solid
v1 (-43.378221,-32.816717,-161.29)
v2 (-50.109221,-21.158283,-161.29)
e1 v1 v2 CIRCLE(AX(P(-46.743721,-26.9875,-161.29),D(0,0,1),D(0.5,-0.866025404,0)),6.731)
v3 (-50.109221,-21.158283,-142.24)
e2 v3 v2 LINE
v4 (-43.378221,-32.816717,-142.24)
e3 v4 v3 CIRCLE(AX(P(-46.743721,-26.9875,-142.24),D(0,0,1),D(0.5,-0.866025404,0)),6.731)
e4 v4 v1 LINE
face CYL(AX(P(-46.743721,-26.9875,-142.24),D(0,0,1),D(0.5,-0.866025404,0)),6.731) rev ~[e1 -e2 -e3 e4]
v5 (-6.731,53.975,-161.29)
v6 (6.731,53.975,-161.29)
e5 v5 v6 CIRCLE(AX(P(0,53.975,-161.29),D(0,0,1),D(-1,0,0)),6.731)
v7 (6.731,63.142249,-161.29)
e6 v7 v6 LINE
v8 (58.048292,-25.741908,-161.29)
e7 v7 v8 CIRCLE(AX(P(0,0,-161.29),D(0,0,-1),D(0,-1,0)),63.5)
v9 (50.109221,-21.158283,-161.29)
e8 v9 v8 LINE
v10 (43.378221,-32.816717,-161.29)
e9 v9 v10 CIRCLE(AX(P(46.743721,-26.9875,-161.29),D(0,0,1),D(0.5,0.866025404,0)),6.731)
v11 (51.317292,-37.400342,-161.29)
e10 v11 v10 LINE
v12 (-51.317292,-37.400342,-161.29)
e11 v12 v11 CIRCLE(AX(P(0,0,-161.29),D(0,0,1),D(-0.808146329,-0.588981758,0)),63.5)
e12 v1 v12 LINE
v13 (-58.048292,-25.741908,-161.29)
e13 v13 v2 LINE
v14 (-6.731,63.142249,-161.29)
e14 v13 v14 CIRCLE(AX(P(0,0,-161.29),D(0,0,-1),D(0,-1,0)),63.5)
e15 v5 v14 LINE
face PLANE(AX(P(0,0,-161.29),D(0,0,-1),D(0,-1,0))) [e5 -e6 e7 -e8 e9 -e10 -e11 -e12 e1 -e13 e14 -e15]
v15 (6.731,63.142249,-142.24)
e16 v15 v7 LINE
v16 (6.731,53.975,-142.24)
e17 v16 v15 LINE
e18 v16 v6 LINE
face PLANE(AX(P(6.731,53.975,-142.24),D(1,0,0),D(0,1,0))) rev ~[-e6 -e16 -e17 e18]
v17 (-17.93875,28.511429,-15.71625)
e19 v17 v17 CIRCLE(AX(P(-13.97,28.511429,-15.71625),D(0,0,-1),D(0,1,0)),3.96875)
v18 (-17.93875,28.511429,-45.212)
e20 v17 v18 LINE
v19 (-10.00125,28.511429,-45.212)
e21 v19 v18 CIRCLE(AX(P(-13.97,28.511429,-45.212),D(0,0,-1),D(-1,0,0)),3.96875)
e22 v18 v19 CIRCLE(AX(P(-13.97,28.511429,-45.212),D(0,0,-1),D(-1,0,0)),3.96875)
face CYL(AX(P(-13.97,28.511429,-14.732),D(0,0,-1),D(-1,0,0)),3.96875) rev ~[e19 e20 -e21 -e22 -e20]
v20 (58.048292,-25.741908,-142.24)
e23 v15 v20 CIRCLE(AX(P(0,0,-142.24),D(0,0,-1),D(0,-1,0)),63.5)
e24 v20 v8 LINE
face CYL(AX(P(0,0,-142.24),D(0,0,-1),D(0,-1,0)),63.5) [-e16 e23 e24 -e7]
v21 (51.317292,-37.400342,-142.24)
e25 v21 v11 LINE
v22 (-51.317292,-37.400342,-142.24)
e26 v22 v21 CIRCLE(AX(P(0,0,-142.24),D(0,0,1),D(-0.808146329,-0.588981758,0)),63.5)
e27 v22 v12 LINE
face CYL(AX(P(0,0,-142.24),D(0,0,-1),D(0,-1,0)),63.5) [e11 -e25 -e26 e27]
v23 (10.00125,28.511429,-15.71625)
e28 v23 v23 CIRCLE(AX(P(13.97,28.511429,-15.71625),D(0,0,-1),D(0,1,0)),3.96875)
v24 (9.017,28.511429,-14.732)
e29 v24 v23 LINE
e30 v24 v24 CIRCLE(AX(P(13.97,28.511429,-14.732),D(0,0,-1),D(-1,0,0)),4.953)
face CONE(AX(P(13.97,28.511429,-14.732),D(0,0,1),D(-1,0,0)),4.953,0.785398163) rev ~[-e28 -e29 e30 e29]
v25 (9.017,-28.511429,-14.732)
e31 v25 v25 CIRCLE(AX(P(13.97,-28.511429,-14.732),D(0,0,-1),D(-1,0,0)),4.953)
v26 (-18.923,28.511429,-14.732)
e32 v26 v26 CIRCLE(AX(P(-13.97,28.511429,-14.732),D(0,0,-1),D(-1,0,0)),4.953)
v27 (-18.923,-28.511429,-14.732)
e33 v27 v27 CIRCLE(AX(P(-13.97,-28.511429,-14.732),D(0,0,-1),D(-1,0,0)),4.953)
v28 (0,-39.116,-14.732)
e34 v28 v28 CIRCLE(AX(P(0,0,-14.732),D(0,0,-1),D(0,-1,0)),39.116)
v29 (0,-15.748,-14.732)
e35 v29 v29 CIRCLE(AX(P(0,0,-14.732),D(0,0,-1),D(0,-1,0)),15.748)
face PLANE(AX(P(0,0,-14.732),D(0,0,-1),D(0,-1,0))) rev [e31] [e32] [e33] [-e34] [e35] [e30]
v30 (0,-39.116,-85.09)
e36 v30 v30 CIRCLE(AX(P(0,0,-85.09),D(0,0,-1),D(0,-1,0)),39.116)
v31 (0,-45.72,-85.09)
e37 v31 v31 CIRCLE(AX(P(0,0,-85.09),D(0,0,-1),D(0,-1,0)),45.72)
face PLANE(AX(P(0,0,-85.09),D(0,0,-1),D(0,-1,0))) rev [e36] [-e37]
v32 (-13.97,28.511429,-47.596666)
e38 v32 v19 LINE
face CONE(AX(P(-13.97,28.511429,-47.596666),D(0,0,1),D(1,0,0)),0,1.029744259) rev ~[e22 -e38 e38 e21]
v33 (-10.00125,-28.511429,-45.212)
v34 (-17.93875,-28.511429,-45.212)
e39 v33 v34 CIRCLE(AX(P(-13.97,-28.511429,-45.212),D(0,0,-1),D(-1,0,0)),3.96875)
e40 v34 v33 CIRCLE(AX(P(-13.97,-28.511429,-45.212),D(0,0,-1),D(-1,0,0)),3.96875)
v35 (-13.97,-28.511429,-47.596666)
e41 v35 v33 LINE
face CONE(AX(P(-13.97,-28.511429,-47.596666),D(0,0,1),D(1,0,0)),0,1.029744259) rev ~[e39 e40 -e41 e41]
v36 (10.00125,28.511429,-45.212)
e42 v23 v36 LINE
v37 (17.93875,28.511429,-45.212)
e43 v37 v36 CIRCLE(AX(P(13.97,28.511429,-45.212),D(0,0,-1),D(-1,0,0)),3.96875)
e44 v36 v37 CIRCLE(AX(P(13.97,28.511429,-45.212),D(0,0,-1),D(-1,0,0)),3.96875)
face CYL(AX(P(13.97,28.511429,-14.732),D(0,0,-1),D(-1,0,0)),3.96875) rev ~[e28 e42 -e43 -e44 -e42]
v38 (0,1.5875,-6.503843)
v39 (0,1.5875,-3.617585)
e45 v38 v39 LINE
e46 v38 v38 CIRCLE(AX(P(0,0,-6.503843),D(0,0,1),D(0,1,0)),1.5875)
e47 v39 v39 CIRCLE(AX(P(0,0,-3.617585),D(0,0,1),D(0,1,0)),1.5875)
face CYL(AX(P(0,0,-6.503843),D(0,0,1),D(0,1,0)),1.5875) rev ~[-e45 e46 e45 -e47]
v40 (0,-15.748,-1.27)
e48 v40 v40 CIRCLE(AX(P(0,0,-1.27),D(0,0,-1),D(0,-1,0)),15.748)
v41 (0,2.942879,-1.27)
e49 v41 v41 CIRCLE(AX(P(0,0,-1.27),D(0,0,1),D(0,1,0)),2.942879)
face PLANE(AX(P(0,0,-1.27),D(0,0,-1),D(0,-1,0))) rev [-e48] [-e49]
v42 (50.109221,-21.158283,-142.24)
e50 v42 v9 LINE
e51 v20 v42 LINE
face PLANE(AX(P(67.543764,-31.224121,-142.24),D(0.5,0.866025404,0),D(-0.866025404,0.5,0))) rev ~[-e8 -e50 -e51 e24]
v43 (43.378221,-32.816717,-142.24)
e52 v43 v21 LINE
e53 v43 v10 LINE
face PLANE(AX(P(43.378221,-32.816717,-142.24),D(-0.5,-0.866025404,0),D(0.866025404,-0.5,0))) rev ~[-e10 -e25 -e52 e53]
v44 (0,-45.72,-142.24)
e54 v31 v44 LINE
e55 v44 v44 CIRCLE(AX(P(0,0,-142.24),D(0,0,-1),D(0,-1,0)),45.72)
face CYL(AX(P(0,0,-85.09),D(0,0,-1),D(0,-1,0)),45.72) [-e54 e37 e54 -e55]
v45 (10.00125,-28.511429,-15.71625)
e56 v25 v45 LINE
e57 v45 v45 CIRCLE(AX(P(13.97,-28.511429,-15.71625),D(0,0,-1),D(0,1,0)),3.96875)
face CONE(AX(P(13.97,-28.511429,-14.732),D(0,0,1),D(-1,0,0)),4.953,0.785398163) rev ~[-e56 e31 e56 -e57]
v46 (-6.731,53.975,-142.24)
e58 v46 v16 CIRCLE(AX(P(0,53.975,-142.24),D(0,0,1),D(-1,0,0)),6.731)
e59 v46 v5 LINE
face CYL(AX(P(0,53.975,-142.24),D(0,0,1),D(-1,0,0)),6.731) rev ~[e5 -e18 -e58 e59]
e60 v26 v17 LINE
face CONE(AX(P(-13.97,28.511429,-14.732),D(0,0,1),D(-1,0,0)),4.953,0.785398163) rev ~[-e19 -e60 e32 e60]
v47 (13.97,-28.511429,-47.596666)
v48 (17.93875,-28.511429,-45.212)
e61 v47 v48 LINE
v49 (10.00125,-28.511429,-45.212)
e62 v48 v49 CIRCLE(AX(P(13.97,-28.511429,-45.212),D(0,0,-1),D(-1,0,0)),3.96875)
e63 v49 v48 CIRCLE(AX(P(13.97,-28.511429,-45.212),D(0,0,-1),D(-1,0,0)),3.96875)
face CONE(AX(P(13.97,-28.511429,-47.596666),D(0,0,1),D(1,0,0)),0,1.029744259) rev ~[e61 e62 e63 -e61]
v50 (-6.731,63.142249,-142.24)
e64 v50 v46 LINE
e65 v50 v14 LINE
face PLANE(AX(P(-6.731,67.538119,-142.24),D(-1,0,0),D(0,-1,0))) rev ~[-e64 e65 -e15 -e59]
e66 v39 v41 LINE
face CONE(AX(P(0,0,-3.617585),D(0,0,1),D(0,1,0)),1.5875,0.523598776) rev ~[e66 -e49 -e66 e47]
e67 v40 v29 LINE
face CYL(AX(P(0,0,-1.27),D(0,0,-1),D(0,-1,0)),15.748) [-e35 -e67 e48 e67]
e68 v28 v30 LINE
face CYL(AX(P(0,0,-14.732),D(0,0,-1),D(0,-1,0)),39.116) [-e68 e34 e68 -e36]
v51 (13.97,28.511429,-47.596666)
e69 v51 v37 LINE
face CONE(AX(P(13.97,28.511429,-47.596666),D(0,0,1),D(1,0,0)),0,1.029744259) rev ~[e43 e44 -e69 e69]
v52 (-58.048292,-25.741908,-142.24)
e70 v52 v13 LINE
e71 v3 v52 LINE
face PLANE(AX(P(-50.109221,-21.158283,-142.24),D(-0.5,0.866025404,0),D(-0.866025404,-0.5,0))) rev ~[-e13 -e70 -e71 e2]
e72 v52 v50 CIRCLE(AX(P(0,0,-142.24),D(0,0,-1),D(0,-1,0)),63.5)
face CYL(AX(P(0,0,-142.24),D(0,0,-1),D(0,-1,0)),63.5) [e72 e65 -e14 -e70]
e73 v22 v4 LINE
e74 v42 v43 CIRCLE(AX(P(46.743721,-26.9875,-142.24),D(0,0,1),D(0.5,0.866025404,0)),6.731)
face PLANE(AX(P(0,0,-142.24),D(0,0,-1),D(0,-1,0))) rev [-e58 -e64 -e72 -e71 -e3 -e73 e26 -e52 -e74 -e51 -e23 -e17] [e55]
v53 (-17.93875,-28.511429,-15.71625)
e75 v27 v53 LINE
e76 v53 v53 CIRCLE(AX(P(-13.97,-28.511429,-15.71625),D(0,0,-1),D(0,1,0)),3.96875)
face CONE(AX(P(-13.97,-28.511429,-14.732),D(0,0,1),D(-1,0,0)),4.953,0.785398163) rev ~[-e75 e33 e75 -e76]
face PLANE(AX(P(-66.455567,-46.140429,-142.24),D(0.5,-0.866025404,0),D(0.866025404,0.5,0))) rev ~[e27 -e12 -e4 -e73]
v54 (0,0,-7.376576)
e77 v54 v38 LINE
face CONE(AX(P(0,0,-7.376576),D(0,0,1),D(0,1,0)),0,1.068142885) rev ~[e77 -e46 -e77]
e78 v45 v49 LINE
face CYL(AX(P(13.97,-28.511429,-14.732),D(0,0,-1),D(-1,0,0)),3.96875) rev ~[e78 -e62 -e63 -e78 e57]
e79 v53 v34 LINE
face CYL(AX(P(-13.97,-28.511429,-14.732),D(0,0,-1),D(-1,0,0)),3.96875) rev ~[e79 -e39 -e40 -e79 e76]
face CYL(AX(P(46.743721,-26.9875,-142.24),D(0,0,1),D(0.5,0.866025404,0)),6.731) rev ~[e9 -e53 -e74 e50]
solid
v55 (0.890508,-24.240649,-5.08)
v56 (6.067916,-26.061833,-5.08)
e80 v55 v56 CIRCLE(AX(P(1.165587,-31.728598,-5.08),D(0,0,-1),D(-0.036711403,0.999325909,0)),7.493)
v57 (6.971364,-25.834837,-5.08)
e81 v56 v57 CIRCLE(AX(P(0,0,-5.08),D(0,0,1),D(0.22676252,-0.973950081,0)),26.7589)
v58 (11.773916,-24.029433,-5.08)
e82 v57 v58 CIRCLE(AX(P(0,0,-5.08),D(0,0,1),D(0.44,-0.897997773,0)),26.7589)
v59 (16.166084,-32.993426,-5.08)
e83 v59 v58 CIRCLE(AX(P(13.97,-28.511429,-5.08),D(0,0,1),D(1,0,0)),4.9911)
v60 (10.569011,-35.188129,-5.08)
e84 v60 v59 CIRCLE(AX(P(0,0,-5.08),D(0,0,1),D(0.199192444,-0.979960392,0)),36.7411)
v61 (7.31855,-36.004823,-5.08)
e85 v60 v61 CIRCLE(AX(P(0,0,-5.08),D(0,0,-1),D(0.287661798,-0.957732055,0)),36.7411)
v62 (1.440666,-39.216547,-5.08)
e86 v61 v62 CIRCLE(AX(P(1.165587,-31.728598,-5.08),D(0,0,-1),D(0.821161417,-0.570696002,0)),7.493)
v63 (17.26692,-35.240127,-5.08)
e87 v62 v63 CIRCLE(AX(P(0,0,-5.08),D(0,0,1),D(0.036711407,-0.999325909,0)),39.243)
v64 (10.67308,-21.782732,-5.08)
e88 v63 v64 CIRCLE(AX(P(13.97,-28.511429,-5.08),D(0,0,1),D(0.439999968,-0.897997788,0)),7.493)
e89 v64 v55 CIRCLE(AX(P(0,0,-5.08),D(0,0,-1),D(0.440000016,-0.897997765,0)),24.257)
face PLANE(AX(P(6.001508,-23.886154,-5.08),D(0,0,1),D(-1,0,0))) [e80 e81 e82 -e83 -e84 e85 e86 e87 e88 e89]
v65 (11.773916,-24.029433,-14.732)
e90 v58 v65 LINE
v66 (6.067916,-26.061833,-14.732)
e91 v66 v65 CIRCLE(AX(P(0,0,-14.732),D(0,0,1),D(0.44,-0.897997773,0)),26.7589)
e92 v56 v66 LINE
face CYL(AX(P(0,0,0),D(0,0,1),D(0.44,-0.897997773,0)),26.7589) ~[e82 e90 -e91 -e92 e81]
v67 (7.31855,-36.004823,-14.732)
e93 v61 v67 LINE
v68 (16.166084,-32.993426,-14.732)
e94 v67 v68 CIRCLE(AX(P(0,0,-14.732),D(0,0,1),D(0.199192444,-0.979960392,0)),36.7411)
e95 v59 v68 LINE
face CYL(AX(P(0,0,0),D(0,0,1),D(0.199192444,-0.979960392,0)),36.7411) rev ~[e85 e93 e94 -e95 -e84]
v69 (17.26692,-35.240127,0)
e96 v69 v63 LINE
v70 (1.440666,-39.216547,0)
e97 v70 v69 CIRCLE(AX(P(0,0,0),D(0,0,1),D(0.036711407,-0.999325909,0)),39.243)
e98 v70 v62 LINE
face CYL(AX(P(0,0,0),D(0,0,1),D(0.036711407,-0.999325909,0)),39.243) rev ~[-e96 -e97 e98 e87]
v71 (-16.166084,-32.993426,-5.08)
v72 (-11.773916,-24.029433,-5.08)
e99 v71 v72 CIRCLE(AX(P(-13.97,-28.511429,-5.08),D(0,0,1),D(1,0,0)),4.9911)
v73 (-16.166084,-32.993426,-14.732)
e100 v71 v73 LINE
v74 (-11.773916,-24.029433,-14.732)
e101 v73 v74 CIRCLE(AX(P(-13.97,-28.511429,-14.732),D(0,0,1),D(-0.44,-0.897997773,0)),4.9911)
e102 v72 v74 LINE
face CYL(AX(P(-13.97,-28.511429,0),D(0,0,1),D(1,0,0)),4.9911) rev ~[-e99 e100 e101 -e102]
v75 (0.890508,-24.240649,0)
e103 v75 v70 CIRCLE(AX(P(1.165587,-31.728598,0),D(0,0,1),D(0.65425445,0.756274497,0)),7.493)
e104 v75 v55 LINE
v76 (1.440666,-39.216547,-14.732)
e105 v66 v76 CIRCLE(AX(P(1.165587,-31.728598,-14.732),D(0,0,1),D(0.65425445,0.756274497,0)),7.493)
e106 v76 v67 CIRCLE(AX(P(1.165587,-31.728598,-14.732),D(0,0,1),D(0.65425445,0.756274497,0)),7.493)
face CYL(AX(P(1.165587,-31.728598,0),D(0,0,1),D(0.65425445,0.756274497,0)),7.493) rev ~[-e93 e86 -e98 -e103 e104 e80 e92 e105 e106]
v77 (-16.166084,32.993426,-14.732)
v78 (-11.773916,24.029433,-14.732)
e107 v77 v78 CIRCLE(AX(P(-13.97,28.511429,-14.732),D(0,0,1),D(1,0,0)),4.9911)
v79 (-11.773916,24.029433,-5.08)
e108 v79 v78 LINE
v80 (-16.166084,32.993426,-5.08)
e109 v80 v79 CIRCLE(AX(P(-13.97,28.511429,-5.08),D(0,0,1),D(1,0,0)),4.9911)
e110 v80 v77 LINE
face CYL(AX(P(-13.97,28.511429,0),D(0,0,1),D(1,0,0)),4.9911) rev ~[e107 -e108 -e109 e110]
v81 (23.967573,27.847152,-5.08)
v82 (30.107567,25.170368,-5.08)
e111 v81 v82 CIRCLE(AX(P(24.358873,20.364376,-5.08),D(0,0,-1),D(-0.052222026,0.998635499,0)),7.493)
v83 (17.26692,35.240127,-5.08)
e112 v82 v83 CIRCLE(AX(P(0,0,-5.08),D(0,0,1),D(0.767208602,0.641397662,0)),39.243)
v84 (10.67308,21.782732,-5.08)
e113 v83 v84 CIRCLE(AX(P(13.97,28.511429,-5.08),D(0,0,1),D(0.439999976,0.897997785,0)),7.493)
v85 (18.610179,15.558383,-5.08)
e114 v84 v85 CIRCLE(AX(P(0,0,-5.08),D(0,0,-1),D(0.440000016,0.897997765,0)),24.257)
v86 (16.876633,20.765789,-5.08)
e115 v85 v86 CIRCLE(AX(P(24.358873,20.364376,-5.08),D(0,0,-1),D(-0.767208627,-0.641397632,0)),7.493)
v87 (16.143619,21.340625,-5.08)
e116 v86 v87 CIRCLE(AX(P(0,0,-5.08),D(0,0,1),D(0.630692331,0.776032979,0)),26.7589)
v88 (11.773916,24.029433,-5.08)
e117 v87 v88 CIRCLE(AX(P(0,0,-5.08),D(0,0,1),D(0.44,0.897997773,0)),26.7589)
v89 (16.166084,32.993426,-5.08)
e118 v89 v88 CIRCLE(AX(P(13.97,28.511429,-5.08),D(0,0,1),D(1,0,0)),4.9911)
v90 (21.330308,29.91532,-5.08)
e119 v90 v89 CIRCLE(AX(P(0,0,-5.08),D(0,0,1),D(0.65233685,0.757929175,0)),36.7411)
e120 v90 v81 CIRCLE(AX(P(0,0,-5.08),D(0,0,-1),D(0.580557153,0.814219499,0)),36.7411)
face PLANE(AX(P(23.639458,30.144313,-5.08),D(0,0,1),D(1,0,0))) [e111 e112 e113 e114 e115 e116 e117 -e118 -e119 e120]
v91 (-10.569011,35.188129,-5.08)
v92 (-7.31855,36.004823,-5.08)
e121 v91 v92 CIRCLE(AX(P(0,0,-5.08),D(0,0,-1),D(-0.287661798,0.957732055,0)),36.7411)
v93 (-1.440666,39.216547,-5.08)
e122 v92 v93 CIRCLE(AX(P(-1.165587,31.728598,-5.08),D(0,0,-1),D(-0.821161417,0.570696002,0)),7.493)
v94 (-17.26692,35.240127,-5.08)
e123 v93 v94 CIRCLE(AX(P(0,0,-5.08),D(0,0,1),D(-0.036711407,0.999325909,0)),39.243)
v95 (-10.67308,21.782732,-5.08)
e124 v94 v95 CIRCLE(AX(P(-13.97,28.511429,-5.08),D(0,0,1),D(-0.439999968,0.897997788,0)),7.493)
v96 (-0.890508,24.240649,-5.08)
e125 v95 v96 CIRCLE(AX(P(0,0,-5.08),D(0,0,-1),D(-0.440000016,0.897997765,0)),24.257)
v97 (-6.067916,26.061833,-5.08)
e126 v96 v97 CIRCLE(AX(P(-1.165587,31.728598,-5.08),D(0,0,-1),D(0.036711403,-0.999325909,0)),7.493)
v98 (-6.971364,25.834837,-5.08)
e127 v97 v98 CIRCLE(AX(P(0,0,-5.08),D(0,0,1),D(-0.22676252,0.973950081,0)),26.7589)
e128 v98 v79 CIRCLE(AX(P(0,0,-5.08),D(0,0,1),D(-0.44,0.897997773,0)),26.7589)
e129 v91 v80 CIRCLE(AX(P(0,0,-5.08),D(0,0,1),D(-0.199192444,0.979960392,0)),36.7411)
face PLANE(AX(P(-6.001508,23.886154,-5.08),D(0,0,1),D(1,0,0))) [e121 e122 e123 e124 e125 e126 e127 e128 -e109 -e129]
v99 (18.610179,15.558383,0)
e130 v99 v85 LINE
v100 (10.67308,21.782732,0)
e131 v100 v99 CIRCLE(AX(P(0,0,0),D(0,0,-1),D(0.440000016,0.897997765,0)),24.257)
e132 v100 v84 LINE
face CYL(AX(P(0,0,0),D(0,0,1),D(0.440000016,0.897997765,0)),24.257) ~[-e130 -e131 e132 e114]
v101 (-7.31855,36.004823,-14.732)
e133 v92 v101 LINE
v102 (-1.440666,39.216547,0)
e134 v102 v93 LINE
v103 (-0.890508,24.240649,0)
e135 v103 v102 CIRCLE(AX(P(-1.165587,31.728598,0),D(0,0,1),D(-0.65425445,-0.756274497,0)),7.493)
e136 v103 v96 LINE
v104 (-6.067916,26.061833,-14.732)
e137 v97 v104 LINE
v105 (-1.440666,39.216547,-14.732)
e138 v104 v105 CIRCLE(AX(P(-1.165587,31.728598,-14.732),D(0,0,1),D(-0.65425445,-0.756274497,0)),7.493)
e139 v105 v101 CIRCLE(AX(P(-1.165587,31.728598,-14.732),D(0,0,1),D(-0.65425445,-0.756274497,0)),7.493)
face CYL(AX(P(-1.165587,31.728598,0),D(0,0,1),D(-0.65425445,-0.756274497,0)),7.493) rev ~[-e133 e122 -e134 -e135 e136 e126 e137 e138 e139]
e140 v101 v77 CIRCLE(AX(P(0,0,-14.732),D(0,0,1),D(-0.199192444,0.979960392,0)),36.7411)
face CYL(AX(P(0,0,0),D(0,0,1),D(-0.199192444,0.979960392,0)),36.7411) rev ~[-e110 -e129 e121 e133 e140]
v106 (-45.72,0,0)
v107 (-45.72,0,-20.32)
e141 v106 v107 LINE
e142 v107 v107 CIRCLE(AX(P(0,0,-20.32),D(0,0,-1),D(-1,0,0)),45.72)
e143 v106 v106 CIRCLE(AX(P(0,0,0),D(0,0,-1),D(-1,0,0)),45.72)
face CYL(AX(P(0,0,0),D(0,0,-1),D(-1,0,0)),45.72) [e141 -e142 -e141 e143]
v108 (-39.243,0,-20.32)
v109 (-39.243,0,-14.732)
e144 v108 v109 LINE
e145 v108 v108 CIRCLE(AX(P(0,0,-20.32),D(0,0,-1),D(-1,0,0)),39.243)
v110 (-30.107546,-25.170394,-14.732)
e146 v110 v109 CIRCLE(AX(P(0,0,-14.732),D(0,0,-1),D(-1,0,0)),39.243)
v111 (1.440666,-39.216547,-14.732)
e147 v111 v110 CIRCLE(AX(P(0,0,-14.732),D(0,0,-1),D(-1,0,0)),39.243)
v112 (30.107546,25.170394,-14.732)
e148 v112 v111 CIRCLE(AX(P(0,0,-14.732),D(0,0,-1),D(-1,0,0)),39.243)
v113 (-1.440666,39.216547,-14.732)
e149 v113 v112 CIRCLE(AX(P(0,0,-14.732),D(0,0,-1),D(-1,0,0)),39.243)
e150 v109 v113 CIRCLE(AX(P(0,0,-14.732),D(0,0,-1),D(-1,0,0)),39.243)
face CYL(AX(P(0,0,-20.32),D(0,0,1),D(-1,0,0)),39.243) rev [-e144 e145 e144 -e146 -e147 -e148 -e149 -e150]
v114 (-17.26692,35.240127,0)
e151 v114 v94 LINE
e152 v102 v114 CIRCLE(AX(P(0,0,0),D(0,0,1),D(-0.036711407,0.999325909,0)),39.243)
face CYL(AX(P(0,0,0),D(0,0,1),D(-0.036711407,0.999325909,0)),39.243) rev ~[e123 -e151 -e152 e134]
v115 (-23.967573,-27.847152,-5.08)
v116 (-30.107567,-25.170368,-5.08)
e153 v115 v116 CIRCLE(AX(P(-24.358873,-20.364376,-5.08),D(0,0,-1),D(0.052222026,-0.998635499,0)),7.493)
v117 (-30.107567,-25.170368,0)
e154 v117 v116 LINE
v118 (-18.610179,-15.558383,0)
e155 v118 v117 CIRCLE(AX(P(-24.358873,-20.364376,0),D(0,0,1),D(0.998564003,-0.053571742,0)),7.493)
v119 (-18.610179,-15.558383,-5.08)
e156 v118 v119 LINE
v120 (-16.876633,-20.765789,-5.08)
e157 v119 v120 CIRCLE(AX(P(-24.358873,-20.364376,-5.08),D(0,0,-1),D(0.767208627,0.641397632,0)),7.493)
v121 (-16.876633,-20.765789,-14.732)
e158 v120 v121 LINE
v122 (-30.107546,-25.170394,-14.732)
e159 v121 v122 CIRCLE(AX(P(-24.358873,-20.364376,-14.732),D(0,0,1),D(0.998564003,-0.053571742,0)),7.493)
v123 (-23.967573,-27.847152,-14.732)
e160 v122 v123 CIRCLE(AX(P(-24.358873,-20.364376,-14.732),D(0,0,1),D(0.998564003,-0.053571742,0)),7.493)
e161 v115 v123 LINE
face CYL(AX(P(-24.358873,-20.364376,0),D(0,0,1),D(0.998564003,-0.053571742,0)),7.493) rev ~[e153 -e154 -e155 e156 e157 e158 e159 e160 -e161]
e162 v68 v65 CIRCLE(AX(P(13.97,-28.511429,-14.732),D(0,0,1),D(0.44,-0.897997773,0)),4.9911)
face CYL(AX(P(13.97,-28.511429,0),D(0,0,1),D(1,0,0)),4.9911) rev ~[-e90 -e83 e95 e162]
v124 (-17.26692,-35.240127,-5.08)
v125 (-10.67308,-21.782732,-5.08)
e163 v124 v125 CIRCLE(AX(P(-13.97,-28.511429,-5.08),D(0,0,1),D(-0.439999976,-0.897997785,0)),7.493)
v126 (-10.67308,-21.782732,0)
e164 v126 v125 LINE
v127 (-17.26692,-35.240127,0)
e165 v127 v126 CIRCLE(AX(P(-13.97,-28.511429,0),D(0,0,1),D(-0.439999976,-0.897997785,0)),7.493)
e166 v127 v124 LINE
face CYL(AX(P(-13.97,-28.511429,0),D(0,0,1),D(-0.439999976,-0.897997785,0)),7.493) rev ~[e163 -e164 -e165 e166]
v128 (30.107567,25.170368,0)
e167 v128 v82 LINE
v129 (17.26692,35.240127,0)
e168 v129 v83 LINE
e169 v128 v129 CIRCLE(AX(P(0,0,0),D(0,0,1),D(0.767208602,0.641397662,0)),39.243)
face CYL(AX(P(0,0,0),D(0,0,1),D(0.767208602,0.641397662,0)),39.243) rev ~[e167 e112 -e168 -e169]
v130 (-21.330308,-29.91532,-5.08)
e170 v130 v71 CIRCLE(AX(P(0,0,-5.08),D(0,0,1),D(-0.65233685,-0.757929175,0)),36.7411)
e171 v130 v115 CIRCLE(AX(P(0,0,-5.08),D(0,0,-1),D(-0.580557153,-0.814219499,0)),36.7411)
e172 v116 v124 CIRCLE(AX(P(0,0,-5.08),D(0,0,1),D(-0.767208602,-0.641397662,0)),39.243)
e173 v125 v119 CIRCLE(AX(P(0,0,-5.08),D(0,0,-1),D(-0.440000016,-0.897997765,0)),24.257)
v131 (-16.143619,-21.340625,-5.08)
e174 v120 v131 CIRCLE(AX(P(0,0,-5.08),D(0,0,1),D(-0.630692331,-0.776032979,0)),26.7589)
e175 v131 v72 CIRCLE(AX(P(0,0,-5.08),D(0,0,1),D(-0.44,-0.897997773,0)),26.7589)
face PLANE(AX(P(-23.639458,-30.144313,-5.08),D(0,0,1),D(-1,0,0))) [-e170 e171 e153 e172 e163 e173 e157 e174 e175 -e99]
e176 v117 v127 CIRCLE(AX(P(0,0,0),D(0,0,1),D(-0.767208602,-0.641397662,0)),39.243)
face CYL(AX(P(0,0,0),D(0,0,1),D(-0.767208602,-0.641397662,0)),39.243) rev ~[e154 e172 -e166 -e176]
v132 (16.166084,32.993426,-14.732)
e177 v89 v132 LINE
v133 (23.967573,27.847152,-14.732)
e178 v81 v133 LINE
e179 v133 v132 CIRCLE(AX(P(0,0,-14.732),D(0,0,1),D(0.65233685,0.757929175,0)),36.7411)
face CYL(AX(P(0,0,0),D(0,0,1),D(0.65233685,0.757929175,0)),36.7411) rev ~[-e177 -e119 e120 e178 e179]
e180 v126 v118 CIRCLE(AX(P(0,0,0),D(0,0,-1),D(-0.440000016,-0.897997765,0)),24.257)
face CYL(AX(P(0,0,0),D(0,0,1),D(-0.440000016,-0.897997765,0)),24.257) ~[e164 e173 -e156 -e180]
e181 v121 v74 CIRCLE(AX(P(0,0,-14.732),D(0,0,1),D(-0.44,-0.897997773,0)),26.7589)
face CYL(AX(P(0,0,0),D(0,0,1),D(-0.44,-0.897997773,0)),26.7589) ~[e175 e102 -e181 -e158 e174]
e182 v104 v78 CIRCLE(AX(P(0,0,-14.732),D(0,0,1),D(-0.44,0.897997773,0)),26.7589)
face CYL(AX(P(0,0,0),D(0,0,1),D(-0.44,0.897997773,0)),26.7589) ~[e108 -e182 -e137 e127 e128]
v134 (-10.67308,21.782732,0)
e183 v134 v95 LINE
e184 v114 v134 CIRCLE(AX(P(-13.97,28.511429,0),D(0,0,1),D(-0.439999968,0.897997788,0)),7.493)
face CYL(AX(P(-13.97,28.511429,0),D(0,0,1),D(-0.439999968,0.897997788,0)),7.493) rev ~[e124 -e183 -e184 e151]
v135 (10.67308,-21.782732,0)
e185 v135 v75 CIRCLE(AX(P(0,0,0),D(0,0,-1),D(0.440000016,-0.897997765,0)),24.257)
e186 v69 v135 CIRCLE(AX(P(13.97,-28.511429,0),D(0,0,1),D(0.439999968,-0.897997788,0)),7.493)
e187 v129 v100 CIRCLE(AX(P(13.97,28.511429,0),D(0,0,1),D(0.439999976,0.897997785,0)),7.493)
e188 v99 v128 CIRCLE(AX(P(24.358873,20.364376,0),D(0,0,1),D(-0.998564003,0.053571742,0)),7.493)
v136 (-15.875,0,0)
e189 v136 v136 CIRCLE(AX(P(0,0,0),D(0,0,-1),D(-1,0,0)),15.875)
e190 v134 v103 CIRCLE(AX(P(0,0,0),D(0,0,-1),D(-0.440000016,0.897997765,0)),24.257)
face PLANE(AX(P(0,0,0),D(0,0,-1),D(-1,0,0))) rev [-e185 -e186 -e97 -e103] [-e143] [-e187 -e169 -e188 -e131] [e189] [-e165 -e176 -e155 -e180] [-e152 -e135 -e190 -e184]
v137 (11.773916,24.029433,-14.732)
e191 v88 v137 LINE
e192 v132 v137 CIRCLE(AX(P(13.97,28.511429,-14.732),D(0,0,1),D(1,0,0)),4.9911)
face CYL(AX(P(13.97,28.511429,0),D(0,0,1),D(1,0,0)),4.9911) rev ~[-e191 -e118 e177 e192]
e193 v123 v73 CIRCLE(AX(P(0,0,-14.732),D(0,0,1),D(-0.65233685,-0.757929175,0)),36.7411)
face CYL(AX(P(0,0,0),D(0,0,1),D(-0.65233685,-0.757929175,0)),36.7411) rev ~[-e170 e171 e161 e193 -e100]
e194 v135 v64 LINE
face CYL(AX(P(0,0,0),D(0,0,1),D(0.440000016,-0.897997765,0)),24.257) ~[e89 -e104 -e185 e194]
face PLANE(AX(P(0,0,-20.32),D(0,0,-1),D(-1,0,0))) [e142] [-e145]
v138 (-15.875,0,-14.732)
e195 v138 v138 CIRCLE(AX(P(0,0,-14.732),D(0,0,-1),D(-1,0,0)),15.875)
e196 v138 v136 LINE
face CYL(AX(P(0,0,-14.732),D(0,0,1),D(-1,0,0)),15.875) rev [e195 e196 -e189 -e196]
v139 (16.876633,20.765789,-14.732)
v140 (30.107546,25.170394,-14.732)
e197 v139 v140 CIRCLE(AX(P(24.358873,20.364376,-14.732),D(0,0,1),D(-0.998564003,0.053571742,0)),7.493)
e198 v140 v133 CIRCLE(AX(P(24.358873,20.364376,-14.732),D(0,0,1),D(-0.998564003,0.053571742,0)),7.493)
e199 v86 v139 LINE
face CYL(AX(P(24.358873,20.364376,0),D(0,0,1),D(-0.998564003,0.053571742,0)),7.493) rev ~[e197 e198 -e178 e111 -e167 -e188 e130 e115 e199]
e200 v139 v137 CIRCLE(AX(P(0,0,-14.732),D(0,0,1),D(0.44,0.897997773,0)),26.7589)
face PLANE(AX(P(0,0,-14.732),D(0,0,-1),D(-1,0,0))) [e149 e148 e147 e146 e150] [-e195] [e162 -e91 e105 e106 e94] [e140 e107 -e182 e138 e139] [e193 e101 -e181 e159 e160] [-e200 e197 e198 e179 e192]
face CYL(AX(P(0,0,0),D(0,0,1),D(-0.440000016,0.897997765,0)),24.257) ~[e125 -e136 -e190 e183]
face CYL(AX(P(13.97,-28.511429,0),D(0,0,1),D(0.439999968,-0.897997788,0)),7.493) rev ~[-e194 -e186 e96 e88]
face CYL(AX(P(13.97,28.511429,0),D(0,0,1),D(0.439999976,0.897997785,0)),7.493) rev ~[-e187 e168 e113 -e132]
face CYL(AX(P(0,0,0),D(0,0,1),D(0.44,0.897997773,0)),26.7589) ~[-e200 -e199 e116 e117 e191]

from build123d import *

# Parameters (mm, degrees)
F2_R            = 4.9911
F3_DEPTH        = 20.321
F5_DEPTH        = 20.321
F5_COPIES_COUNT = 2
F7_DEPTH        = 5.08
F7_COPIES_COUNT = 2
F12_D           = 7.9375
F12_DEPTH       = 30.48
F12_CSINK_D     = 9.906
F12_CSINK_ANGLE = 90
F12_TIP         = 2.3846655818
F14_DEPTH       = 25.4


# Not quite as in the source:
# - a pattern or mirror of a feature is missing from the dataset's text; its kind, count and spacing are read off the source's solid


with BuildPart() as f1:
    # F0 (on Front) → F1 (revolve)
    with BuildSketch(Plane.XZ):
        Polygon((-15.875, -14.732), (-15.875, 0), (-45.72, 0), (-45.72, -20.32), (-39.243, -20.32), (-39.243, -14.732), align=None)
    revolve(axis=Axis((0, 0, -19.2851209147), (0, 0, -1)))

    # F2 (on face) → F3 (cut, through all)
    with BuildSketch(Plane.XY):
        with Locations((-13.97, 28.5114292872)):
            Circle(F2_R)
        with Locations((13.97, 28.5114292872)):
            Circle(F2_R)
        with Locations((13.97, -28.5114292872)):
            Circle(F2_R)
        with Locations((-13.97, -28.5114292872)):
            Circle(F2_R)
    extrude(amount=-F3_DEPTH, mode=Mode.SUBTRACT)

    # F4 (on face) → F5 (cut, through all)
    with BuildSketch(Plane.XY):
        with BuildLine():
            ThreePointArc((-11.773916, 24.0294326033), (-8.978607984, 25.2076045645), (-6.0679155964, 26.0618328121))
            ThreePointArc((-6.0679155964, 26.0618328121), (6.2688347989, 32.6637026574), (-7.318549504, 36.0048227654))
            ThreePointArc((-7.318549504, 36.0048227654), (-11.8384597971, 34.7815942539), (-16.166084, 32.9934259712))
            ThreePointArc((-16.166084, 32.9934259712), (-18.451996684, 26.3153452872), (-11.773916, 24.0294326033))
        make_face()
        with BuildLine():
            ThreePointArc((11.773916, 24.0294326033), (14.4179170537, 22.5424576531), (16.876633005, 20.7657888756))
            ThreePointArc((16.876633005, 20.7657888756), (29.6536423348, 15.0624452633), (23.9675734397, 27.847151607))
            ThreePointArc((23.9675734397, 27.847151607), (20.2311307106, 30.6693622265), (16.166084, 32.9934259712))
            ThreePointArc((16.166084, 32.9934259712), (9.488003316, 30.7075132872), (11.773916, 24.0294326033))
        make_face()
    f5 = extrude(amount=-F5_DEPTH, mode=Mode.SUBTRACT)

    # F5_copies: F5 ×2 about axis
    f5_copies_axis = Axis((0, 0, 0), (0, 0, 1))
    for i in range(1, F5_COPIES_COUNT):
        add(f5.rotate(f5_copies_axis, i * 360 / F5_COPIES_COUNT), mode=Mode.SUBTRACT)

    # F6 (on face) → F7 (cut)
    with BuildSketch(Plane.XY):
        with BuildLine():
            ThreePointArc((-6.0679155964, 26.0618328121), (-6.5206277247, 25.952266631), (-6.9713641639, 25.8348371565))
            ThreePointArc((-6.9713641639, 25.8348371565), (-8.4378661433, 23.4576639591), (-10.6730803815, 21.7827317885))
            ThreePointArc((-10.6730803815, 21.7827317885), (-5.9109631603, 23.5257850776), (-0.890508463, 24.240648582))
            ThreePointArc((-0.890508463, 24.240648582), (-3.6519576039, 24.6601458625), (-6.0679155964, 26.0618328121))
        make_face()
        with BuildLine():
            ThreePointArc((-16.166084, 32.9934259712), (-13.4125130079, 34.2054516711), (-10.5690108827, 35.1881292224))
            ThreePointArc((-10.5690108827, 35.1881292224), (-13.9118317745, 36.0042035036), (-17.2669197627, 35.2401267153))
            ThreePointArc((-17.2669197627, 35.2401267153), (-20.6986974634, 25.2145095966), (-10.6730803815, 21.7827317885))
            ThreePointArc((-10.6730803815, 21.7827317885), (-8.4378661433, 23.4576639591), (-6.9713641639, 25.8348371565))
            ThreePointArc((-6.9713641639, 25.8348371565), (-9.4160104878, 25.0475043807), (-11.773916, 24.0294326033))
            ThreePointArc((-11.773916, 24.0294326033), (-18.451996684, 26.3153452872), (-16.166084, 32.9934259712))
        make_face()
        with BuildLine():
            ThreePointArc((-17.2669197627, 35.2401267153), (-13.9118317745, 36.0042035036), (-10.5690108827, 35.1881292224))
            ThreePointArc((-10.5690108827, 35.1881292224), (-8.9530972983, 35.633558312), (-7.318549504, 36.0048227654))
            ThreePointArc((-7.318549504, 36.0048227654), (-4.7584578806, 38.3040312845), (-1.440665747, 39.2165466507))
            ThreePointArc((-1.440665747, 39.2165466507), (-9.562762037, 38.0600398216), (-17.2669197627, 35.2401267153))
        make_face()
        with BuildLine():
            ThreePointArc((30.1075671654, 25.1703684593), (24.2164306207, 30.8800507932), (17.2669198215, 35.2401266865))
            ThreePointArc((17.2669198215, 35.2401266865), (19.9267205597, 33.0570347666), (21.3303084021, 29.9153200331))
            ThreePointArc((21.3303084021, 29.9153200331), (22.6725352574, 28.9113225953), (23.9675734397, 27.847151607))
            ThreePointArc((23.9675734397, 27.847151607), (27.3533197427, 27.2330247473), (30.1075671654, 25.1703684593))
        make_face()
        with BuildLine():
            ThreePointArc((21.3303084021, 29.9153200331), (19.9267205597, 33.0570347666), (17.2669198215, 35.2401266865))
            ThreePointArc((17.2669198215, 35.2401266865), (7.2413025475, 31.808349), (10.673080396, 21.7827317814))
            ThreePointArc((10.673080396, 21.7827317814), (13.3664144509, 21.0427792429), (16.1436191209, 21.3406253632))
            ThreePointArc((16.1436191209, 21.3406253632), (14.023359544, 22.7900003578), (11.773916, 24.0294326033))
            ThreePointArc((11.773916, 24.0294326033), (9.488003316, 30.7075132872), (16.166084, 32.9934259712))
            ThreePointArc((16.166084, 32.9934259712), (18.8112611176, 31.560178776), (21.3303084021, 29.9153200331))
        make_face()
        with BuildLine():
            ThreePointArc((16.1436191209, 21.3406253632), (13.3664144509, 21.0427792429), (10.673080396, 21.7827317814))
            ThreePointArc((10.673080396, 21.7827317814), (14.9687322834, 19.0876688683), (18.6101788379, 15.558383355))
            ThreePointArc((18.6101788379, 15.558383355), (17.2494656652, 17.9976533533), (16.876633005, 20.7657888756))
            ThreePointArc((16.876633005, 20.7657888756), (16.5126276486, 21.0563970648), (16.1436191209, 21.3406253632))
        make_face()
        with BuildLine():
            ThreePointArc((-6.9713641639, 25.8348371565), (-6.6016274755, 27.1504974961), (-6.477, 28.5114292872))
            ThreePointArc((-6.477, 28.5114292872), (-7.5813905873, 32.4268754651), (-10.5690108827, 35.1881292224))
            ThreePointArc((-10.5690108827, 35.1881292224), (-13.4125130079, 34.2054516711), (-16.166084, 32.9934259712))
            ThreePointArc((-16.166084, 32.9934259712), (-18.451996684, 26.3153452872), (-11.773916, 24.0294326033))
            ThreePointArc((-11.773916, 24.0294326033), (-9.4160104878, 25.0475043807), (-6.9713641639, 25.8348371565))
        make_face()
        with BuildLine():
            ThreePointArc((21.463, 28.5114292872), (21.4297533423, 29.216503093), (21.3303084021, 29.9153200331))
            ThreePointArc((21.3303084021, 29.9153200331), (18.8112611176, 31.560178776), (16.166084, 32.9934259712))
            ThreePointArc((16.166084, 32.9934259712), (9.488003316, 30.7075132872), (11.773916, 24.0294326033))
            ThreePointArc((11.773916, 24.0294326033), (14.023359544, 22.7900003578), (16.1436191209, 21.3406253632))
            ThreePointArc((16.1436191209, 21.3406253632), (19.9879721282, 24.047231659), (21.463, 28.5114292872))
        make_face()
    f7 = extrude(amount=-F7_DEPTH, mode=Mode.SUBTRACT)

    # F7_copies: F7 ×2 about axis
    f7_copies_axis = Axis((0, 0, 0), (0, 0, 1))
    for i in range(1, F7_COPIES_COUNT):
        add(f7.rotate(f7_copies_axis, i * 360 / F7_COPIES_COUNT), mode=Mode.SUBTRACT)


with BuildPart() as f9:
    # F8 (on Right) → F9 (revolve)
    with BuildSketch(Plane.YZ):
        Polygon((-39.116, -14.732), (-39.116, -85.09), (-45.72, -85.09), (-45.72, -142.24), (-63.5, -142.24), (-63.5, -161.29), (0, -161.29), (0, -1.27), (-15.748, -1.27), (-15.748, -14.732), align=None)
    revolve(axis=Axis((0, 0, -69.3293474615), (0, 0, -1)))

    # F12
    with Locations(Plane.XY.offset(-14.732)):
        with Locations((-13.97, 28.5114292872), (-13.97, -28.5114292872), (13.97, -28.5114292872), (13.97, 28.5114292872)):
            CounterSinkHole(F12_D / 2, F12_CSINK_D / 2, depth=F12_DEPTH, counter_sink_angle=F12_CSINK_ANGLE)
            with Locations((0, 0, -(F12_DEPTH + F12_TIP / 2))):  # 118° drill point
                Cone(0, F12_D / 2, F12_TIP, mode=Mode.SUBTRACT)

    # F13 (on face) → F14 (cut)
    with BuildSketch(Plane.XY.offset(-142.24)):
        with BuildLine():
            Line((-6.731, 67.5381188877), (-6.731, 53.975))
            ThreePointArc((-6.731, 53.975), (0, 47.244), (6.731, 53.975))
            Line((6.731, 53.975), (6.731, 67.5381188877))
            Line((6.731, 67.5381188877), (-6.731, 67.5381188877))
        make_face()
        with BuildLine():
            Line((67.5437636953, -31.2241208278), (50.1092211693, -21.1582830071))
            ThreePointArc((50.1092211693, -21.1582830071), (40.9145041764, -23.622), (43.3782211693, -32.8167169929))
            Line((43.3782211693, -32.8167169929), (60.8127636953, -42.8825548135))
            Line((60.8127636953, -42.8825548135), (67.5437636953, -31.2241208278))
        make_face()
        with BuildLine():
            Line((-66.4555672965, -46.1404289916), (-43.3782211693, -32.8167169929))
            ThreePointArc((-43.3782211693, -32.8167169929), (-40.9145041764, -23.622), (-50.1092211693, -21.1582830071))
            Line((-50.1092211693, -21.1582830071), (-73.1865672965, -34.4819950059))
            Line((-73.1865672965, -34.4819950059), (-66.4555672965, -46.1404289916))
        make_face()
    extrude(amount=-F14_DEPTH, mode=Mode.SUBTRACT)

    # F15 (on Right) → F16 (revolve, cut)
    with BuildSketch(Plane.YZ):
        Polygon((1.5875, -3.6175851259), (2.9428789044, -1.27), (0, -1.27), (0, -7.3765758425), (1.5875, -6.5038431916), align=None)
    revolve(axis=Axis((0, 0, -4.3232879212), (0, 0, 1)), mode=Mode.SUBTRACT)


solid = Compound([f1.part, f9.part])
